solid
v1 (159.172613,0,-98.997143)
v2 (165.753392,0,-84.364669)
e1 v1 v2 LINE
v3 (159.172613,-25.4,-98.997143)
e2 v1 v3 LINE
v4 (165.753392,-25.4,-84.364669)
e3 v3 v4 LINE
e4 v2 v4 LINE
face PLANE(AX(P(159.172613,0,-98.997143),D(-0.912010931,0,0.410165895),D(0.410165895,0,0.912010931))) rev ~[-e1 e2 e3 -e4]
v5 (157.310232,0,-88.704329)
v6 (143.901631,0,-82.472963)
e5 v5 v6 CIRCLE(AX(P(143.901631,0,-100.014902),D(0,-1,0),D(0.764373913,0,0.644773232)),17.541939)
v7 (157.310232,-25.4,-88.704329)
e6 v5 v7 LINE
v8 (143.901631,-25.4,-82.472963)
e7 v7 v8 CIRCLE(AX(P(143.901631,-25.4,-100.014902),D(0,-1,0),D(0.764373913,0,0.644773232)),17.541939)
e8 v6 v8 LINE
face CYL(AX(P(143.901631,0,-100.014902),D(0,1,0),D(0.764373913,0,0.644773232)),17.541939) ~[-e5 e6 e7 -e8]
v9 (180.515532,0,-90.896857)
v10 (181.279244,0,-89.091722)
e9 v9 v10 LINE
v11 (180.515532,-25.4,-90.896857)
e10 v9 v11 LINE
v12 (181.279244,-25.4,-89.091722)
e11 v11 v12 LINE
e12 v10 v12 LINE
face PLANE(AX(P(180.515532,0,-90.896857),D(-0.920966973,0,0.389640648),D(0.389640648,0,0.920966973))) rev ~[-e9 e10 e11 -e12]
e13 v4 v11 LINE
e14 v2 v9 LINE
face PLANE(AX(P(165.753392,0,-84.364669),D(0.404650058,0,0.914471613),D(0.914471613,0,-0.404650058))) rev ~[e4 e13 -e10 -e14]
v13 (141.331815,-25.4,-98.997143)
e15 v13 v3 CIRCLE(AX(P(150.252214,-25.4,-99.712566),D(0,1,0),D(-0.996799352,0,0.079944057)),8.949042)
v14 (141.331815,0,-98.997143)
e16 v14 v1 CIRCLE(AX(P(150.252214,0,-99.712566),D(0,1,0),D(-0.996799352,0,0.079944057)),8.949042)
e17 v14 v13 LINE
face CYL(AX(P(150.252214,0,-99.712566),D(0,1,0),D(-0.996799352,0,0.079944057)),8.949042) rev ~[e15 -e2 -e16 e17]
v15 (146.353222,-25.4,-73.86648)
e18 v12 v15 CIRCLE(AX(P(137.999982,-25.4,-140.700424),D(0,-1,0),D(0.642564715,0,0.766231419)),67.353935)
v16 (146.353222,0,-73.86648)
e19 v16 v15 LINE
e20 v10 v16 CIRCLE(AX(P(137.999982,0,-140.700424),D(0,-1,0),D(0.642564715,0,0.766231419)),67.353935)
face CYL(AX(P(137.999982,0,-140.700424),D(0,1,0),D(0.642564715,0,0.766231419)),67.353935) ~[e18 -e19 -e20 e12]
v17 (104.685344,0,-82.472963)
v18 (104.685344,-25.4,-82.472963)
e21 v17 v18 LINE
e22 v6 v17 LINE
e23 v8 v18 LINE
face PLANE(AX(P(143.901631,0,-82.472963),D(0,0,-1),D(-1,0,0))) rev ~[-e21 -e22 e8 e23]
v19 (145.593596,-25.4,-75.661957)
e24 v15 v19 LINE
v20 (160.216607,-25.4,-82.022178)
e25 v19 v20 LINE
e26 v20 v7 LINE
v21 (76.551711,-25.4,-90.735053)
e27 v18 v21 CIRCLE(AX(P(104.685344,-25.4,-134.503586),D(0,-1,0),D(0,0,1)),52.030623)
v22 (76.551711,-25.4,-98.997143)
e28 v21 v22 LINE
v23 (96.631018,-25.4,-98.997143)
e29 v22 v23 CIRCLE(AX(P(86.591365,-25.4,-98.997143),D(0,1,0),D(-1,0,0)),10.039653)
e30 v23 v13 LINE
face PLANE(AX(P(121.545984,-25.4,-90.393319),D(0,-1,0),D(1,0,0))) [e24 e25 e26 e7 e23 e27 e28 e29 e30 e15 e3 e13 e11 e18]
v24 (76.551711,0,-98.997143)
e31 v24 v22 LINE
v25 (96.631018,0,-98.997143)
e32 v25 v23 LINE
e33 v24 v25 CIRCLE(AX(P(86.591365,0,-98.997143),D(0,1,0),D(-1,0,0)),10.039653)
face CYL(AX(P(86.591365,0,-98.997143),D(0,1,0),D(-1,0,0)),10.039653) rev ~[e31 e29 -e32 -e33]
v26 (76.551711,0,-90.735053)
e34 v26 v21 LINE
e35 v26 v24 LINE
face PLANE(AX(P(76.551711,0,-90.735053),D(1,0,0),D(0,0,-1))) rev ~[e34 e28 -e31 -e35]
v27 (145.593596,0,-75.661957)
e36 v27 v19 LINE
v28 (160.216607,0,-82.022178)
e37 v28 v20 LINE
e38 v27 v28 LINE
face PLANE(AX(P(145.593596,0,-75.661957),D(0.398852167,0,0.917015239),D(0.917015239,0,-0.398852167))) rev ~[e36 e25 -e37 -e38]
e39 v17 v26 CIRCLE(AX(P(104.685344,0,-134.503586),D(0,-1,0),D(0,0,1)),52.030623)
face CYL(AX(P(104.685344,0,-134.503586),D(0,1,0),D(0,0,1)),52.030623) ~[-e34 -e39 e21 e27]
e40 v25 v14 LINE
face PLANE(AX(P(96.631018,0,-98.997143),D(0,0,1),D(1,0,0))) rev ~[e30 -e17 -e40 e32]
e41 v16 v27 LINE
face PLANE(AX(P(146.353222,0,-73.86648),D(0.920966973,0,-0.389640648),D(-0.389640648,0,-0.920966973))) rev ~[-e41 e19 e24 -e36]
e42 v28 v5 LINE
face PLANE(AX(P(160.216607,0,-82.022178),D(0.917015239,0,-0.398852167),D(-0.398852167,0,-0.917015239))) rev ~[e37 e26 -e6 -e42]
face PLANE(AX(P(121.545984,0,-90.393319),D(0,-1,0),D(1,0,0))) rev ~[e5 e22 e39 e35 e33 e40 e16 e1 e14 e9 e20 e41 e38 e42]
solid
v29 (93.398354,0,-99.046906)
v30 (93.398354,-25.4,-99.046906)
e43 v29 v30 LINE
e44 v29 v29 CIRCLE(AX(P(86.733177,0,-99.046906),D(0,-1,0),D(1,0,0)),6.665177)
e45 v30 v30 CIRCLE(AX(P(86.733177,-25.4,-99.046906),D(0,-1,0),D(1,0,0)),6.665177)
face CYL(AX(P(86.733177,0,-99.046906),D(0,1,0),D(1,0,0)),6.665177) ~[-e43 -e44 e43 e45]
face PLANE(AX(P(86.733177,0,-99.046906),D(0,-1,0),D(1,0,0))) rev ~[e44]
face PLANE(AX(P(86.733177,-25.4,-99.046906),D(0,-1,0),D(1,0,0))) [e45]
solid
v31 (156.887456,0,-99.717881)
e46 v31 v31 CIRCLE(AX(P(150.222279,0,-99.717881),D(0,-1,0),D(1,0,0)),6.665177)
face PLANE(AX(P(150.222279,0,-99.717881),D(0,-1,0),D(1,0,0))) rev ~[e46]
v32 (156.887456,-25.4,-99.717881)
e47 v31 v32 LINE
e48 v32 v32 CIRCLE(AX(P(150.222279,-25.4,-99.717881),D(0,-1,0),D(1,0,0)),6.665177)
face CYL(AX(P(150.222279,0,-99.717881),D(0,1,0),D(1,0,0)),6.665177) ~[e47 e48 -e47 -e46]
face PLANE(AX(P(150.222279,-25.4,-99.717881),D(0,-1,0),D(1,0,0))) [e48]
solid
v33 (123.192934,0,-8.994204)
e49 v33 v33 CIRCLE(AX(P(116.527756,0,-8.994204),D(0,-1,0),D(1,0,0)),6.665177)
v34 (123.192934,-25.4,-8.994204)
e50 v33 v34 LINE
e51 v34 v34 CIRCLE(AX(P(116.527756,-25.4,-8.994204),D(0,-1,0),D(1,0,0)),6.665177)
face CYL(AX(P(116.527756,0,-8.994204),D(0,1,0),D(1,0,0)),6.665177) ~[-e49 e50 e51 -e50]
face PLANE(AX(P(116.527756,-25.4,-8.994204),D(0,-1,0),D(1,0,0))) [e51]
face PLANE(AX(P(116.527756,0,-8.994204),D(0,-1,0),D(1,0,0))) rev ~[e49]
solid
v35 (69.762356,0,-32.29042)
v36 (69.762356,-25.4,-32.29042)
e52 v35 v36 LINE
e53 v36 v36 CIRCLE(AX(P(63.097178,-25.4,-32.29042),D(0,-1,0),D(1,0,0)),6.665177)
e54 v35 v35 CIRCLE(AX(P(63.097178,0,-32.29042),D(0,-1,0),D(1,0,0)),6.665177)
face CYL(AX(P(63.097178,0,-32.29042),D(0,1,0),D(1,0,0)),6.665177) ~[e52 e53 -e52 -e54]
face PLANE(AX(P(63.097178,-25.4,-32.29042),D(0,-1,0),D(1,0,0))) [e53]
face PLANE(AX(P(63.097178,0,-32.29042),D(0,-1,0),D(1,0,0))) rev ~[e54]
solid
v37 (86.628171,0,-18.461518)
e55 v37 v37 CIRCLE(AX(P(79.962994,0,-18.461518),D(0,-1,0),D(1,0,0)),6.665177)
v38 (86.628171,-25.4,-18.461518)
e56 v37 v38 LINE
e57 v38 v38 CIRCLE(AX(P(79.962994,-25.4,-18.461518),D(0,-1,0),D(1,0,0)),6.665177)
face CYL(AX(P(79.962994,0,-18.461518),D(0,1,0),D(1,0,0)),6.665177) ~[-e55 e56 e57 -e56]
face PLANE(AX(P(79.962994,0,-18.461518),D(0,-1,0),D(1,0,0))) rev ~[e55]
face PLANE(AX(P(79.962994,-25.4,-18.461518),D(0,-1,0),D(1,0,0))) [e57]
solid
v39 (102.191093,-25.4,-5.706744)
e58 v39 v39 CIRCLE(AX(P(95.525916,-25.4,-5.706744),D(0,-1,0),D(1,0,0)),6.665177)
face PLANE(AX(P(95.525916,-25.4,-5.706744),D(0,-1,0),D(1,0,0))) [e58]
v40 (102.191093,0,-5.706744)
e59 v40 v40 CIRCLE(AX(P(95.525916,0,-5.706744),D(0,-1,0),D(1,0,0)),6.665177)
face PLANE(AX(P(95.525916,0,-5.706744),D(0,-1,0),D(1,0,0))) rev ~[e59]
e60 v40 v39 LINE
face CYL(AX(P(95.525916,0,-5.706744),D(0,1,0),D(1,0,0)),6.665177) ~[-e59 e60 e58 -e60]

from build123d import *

# Parameters (mm, degrees)
F0_R     = 6.6651774255
F1_DEPTH = 25.4
F2_DEPTH = 25.4


# Not quite as in the source:
# - a feature names something its author has since deleted; it is built from what else it names


with BuildPart() as f1:
    # F0 (on Front) → F1 (new body)
    with BuildSketch(Plane.XZ):
        with Locations((63.0971782387, -32.2904203791)):
            Circle(F0_R)
    extrude(amount=F1_DEPTH)

    # F0 (on Front) → F2 (join)
    with BuildSketch(Plane.XZ):
        with Locations((63.0971782387, -32.2904203791)):
            Circle(F0_R)
    extrude(amount=F2_DEPTH)


with BuildPart() as f2:
    # F0 (on Front) → F2, piece 2 (new body)
    with BuildSketch(Plane.XZ):
        with Locations((79.9629938861, -18.4615177807)):
            Circle(F0_R)
    extrude(amount=F2_DEPTH)


with BuildPart() as f2b:
    # F0 (on Front) → F2, piece 3 (new body)
    with BuildSketch(Plane.XZ):
        with Locations((95.5259158782, -5.706744201)):
            Circle(F0_R)
    extrude(amount=F2_DEPTH)


with BuildPart() as f2c:
    # F0 (on Front) → F2, piece 4 (new body)
    with BuildSketch(Plane.XZ):
        with Locations((116.5277564155, -8.9942043108)):
            Circle(F0_R)
    extrude(amount=F2_DEPTH)


with BuildPart() as f2d:
    # F0 (on Front) → F2, piece 5 (new body)
    with BuildSketch(Plane.XZ):
        with BuildLine():
            ThreePointArc((157.310231805, -88.7043293319), (151.2945416105, -84.1069008982), (143.901631238, -82.4729630341))
            Line((143.901631238, -82.4729630341), (104.6853437268, -82.4729630341))
            ThreePointArc((104.6853437268, -82.4729630341), (90.0244825693, -84.5811974693), (76.5517114458, -90.7350532171))
            Line((76.5517114458, -90.7350532171), (76.5517114458, -98.9971434001))
            ThreePointArc((76.5517114458, -98.9971434001), (86.591364621, -88.957490225), (96.6310177961, -98.9971434001))
            Line((96.6310177961, -98.9971434001), (141.3318150355, -98.9971434001))
            ThreePointArc((141.3318150355, -98.9971434001), (150.2522141557, -90.7635242584), (159.1726132759, -98.9971434001))
            Line((159.1726132759, -98.9971434001), (165.7533920403, -84.3646685002))
            Line((165.7533920403, -84.3646685002), (160.2166072323, -82.0221779593))
            Line((160.2166072323, -82.0221779593), (157.310231805, -88.7043293319))
        make_face()
        with BuildLine():
            Line((145.5935956957, -75.6619566722), (160.2166072323, -82.0221779593))
            Line((160.2166072323, -82.0221779593), (165.7533920403, -84.3646685002))
            Line((165.7533920403, -84.3646685002), (180.5155317609, -90.8968567243))
            Line((180.5155317609, -90.8968567243), (181.2792439876, -89.0917223253))
            ThreePointArc((181.2792439876, -89.0917223253), (164.9152343167, -78.9580413658), (146.3532217869, -73.8664803927))
            Line((146.3532217869, -73.8664803927), (145.5935956957, -75.6619566722))
        make_face()
    extrude(amount=F2_DEPTH)


with BuildPart() as f2e:
    # F0 (on Front) → F2, piece 6 (new body)
    with BuildSketch(Plane.XZ):
        with Locations((86.7331768035, -99.0469055689)):
            Circle(F0_R)
    extrude(amount=F2_DEPTH)


with BuildPart() as f2f:
    # F0 (on Front) → F2, piece 7 (new body)
    with BuildSketch(Plane.XZ):
        with Locations((150.2222788557, -99.7178808889)):
            Circle(F0_R)
    extrude(amount=F2_DEPTH)


solid = Compound([f1.part, f2.part, f2b.part, f2c.part, f2d.part, f2e.part, f2f.part])
